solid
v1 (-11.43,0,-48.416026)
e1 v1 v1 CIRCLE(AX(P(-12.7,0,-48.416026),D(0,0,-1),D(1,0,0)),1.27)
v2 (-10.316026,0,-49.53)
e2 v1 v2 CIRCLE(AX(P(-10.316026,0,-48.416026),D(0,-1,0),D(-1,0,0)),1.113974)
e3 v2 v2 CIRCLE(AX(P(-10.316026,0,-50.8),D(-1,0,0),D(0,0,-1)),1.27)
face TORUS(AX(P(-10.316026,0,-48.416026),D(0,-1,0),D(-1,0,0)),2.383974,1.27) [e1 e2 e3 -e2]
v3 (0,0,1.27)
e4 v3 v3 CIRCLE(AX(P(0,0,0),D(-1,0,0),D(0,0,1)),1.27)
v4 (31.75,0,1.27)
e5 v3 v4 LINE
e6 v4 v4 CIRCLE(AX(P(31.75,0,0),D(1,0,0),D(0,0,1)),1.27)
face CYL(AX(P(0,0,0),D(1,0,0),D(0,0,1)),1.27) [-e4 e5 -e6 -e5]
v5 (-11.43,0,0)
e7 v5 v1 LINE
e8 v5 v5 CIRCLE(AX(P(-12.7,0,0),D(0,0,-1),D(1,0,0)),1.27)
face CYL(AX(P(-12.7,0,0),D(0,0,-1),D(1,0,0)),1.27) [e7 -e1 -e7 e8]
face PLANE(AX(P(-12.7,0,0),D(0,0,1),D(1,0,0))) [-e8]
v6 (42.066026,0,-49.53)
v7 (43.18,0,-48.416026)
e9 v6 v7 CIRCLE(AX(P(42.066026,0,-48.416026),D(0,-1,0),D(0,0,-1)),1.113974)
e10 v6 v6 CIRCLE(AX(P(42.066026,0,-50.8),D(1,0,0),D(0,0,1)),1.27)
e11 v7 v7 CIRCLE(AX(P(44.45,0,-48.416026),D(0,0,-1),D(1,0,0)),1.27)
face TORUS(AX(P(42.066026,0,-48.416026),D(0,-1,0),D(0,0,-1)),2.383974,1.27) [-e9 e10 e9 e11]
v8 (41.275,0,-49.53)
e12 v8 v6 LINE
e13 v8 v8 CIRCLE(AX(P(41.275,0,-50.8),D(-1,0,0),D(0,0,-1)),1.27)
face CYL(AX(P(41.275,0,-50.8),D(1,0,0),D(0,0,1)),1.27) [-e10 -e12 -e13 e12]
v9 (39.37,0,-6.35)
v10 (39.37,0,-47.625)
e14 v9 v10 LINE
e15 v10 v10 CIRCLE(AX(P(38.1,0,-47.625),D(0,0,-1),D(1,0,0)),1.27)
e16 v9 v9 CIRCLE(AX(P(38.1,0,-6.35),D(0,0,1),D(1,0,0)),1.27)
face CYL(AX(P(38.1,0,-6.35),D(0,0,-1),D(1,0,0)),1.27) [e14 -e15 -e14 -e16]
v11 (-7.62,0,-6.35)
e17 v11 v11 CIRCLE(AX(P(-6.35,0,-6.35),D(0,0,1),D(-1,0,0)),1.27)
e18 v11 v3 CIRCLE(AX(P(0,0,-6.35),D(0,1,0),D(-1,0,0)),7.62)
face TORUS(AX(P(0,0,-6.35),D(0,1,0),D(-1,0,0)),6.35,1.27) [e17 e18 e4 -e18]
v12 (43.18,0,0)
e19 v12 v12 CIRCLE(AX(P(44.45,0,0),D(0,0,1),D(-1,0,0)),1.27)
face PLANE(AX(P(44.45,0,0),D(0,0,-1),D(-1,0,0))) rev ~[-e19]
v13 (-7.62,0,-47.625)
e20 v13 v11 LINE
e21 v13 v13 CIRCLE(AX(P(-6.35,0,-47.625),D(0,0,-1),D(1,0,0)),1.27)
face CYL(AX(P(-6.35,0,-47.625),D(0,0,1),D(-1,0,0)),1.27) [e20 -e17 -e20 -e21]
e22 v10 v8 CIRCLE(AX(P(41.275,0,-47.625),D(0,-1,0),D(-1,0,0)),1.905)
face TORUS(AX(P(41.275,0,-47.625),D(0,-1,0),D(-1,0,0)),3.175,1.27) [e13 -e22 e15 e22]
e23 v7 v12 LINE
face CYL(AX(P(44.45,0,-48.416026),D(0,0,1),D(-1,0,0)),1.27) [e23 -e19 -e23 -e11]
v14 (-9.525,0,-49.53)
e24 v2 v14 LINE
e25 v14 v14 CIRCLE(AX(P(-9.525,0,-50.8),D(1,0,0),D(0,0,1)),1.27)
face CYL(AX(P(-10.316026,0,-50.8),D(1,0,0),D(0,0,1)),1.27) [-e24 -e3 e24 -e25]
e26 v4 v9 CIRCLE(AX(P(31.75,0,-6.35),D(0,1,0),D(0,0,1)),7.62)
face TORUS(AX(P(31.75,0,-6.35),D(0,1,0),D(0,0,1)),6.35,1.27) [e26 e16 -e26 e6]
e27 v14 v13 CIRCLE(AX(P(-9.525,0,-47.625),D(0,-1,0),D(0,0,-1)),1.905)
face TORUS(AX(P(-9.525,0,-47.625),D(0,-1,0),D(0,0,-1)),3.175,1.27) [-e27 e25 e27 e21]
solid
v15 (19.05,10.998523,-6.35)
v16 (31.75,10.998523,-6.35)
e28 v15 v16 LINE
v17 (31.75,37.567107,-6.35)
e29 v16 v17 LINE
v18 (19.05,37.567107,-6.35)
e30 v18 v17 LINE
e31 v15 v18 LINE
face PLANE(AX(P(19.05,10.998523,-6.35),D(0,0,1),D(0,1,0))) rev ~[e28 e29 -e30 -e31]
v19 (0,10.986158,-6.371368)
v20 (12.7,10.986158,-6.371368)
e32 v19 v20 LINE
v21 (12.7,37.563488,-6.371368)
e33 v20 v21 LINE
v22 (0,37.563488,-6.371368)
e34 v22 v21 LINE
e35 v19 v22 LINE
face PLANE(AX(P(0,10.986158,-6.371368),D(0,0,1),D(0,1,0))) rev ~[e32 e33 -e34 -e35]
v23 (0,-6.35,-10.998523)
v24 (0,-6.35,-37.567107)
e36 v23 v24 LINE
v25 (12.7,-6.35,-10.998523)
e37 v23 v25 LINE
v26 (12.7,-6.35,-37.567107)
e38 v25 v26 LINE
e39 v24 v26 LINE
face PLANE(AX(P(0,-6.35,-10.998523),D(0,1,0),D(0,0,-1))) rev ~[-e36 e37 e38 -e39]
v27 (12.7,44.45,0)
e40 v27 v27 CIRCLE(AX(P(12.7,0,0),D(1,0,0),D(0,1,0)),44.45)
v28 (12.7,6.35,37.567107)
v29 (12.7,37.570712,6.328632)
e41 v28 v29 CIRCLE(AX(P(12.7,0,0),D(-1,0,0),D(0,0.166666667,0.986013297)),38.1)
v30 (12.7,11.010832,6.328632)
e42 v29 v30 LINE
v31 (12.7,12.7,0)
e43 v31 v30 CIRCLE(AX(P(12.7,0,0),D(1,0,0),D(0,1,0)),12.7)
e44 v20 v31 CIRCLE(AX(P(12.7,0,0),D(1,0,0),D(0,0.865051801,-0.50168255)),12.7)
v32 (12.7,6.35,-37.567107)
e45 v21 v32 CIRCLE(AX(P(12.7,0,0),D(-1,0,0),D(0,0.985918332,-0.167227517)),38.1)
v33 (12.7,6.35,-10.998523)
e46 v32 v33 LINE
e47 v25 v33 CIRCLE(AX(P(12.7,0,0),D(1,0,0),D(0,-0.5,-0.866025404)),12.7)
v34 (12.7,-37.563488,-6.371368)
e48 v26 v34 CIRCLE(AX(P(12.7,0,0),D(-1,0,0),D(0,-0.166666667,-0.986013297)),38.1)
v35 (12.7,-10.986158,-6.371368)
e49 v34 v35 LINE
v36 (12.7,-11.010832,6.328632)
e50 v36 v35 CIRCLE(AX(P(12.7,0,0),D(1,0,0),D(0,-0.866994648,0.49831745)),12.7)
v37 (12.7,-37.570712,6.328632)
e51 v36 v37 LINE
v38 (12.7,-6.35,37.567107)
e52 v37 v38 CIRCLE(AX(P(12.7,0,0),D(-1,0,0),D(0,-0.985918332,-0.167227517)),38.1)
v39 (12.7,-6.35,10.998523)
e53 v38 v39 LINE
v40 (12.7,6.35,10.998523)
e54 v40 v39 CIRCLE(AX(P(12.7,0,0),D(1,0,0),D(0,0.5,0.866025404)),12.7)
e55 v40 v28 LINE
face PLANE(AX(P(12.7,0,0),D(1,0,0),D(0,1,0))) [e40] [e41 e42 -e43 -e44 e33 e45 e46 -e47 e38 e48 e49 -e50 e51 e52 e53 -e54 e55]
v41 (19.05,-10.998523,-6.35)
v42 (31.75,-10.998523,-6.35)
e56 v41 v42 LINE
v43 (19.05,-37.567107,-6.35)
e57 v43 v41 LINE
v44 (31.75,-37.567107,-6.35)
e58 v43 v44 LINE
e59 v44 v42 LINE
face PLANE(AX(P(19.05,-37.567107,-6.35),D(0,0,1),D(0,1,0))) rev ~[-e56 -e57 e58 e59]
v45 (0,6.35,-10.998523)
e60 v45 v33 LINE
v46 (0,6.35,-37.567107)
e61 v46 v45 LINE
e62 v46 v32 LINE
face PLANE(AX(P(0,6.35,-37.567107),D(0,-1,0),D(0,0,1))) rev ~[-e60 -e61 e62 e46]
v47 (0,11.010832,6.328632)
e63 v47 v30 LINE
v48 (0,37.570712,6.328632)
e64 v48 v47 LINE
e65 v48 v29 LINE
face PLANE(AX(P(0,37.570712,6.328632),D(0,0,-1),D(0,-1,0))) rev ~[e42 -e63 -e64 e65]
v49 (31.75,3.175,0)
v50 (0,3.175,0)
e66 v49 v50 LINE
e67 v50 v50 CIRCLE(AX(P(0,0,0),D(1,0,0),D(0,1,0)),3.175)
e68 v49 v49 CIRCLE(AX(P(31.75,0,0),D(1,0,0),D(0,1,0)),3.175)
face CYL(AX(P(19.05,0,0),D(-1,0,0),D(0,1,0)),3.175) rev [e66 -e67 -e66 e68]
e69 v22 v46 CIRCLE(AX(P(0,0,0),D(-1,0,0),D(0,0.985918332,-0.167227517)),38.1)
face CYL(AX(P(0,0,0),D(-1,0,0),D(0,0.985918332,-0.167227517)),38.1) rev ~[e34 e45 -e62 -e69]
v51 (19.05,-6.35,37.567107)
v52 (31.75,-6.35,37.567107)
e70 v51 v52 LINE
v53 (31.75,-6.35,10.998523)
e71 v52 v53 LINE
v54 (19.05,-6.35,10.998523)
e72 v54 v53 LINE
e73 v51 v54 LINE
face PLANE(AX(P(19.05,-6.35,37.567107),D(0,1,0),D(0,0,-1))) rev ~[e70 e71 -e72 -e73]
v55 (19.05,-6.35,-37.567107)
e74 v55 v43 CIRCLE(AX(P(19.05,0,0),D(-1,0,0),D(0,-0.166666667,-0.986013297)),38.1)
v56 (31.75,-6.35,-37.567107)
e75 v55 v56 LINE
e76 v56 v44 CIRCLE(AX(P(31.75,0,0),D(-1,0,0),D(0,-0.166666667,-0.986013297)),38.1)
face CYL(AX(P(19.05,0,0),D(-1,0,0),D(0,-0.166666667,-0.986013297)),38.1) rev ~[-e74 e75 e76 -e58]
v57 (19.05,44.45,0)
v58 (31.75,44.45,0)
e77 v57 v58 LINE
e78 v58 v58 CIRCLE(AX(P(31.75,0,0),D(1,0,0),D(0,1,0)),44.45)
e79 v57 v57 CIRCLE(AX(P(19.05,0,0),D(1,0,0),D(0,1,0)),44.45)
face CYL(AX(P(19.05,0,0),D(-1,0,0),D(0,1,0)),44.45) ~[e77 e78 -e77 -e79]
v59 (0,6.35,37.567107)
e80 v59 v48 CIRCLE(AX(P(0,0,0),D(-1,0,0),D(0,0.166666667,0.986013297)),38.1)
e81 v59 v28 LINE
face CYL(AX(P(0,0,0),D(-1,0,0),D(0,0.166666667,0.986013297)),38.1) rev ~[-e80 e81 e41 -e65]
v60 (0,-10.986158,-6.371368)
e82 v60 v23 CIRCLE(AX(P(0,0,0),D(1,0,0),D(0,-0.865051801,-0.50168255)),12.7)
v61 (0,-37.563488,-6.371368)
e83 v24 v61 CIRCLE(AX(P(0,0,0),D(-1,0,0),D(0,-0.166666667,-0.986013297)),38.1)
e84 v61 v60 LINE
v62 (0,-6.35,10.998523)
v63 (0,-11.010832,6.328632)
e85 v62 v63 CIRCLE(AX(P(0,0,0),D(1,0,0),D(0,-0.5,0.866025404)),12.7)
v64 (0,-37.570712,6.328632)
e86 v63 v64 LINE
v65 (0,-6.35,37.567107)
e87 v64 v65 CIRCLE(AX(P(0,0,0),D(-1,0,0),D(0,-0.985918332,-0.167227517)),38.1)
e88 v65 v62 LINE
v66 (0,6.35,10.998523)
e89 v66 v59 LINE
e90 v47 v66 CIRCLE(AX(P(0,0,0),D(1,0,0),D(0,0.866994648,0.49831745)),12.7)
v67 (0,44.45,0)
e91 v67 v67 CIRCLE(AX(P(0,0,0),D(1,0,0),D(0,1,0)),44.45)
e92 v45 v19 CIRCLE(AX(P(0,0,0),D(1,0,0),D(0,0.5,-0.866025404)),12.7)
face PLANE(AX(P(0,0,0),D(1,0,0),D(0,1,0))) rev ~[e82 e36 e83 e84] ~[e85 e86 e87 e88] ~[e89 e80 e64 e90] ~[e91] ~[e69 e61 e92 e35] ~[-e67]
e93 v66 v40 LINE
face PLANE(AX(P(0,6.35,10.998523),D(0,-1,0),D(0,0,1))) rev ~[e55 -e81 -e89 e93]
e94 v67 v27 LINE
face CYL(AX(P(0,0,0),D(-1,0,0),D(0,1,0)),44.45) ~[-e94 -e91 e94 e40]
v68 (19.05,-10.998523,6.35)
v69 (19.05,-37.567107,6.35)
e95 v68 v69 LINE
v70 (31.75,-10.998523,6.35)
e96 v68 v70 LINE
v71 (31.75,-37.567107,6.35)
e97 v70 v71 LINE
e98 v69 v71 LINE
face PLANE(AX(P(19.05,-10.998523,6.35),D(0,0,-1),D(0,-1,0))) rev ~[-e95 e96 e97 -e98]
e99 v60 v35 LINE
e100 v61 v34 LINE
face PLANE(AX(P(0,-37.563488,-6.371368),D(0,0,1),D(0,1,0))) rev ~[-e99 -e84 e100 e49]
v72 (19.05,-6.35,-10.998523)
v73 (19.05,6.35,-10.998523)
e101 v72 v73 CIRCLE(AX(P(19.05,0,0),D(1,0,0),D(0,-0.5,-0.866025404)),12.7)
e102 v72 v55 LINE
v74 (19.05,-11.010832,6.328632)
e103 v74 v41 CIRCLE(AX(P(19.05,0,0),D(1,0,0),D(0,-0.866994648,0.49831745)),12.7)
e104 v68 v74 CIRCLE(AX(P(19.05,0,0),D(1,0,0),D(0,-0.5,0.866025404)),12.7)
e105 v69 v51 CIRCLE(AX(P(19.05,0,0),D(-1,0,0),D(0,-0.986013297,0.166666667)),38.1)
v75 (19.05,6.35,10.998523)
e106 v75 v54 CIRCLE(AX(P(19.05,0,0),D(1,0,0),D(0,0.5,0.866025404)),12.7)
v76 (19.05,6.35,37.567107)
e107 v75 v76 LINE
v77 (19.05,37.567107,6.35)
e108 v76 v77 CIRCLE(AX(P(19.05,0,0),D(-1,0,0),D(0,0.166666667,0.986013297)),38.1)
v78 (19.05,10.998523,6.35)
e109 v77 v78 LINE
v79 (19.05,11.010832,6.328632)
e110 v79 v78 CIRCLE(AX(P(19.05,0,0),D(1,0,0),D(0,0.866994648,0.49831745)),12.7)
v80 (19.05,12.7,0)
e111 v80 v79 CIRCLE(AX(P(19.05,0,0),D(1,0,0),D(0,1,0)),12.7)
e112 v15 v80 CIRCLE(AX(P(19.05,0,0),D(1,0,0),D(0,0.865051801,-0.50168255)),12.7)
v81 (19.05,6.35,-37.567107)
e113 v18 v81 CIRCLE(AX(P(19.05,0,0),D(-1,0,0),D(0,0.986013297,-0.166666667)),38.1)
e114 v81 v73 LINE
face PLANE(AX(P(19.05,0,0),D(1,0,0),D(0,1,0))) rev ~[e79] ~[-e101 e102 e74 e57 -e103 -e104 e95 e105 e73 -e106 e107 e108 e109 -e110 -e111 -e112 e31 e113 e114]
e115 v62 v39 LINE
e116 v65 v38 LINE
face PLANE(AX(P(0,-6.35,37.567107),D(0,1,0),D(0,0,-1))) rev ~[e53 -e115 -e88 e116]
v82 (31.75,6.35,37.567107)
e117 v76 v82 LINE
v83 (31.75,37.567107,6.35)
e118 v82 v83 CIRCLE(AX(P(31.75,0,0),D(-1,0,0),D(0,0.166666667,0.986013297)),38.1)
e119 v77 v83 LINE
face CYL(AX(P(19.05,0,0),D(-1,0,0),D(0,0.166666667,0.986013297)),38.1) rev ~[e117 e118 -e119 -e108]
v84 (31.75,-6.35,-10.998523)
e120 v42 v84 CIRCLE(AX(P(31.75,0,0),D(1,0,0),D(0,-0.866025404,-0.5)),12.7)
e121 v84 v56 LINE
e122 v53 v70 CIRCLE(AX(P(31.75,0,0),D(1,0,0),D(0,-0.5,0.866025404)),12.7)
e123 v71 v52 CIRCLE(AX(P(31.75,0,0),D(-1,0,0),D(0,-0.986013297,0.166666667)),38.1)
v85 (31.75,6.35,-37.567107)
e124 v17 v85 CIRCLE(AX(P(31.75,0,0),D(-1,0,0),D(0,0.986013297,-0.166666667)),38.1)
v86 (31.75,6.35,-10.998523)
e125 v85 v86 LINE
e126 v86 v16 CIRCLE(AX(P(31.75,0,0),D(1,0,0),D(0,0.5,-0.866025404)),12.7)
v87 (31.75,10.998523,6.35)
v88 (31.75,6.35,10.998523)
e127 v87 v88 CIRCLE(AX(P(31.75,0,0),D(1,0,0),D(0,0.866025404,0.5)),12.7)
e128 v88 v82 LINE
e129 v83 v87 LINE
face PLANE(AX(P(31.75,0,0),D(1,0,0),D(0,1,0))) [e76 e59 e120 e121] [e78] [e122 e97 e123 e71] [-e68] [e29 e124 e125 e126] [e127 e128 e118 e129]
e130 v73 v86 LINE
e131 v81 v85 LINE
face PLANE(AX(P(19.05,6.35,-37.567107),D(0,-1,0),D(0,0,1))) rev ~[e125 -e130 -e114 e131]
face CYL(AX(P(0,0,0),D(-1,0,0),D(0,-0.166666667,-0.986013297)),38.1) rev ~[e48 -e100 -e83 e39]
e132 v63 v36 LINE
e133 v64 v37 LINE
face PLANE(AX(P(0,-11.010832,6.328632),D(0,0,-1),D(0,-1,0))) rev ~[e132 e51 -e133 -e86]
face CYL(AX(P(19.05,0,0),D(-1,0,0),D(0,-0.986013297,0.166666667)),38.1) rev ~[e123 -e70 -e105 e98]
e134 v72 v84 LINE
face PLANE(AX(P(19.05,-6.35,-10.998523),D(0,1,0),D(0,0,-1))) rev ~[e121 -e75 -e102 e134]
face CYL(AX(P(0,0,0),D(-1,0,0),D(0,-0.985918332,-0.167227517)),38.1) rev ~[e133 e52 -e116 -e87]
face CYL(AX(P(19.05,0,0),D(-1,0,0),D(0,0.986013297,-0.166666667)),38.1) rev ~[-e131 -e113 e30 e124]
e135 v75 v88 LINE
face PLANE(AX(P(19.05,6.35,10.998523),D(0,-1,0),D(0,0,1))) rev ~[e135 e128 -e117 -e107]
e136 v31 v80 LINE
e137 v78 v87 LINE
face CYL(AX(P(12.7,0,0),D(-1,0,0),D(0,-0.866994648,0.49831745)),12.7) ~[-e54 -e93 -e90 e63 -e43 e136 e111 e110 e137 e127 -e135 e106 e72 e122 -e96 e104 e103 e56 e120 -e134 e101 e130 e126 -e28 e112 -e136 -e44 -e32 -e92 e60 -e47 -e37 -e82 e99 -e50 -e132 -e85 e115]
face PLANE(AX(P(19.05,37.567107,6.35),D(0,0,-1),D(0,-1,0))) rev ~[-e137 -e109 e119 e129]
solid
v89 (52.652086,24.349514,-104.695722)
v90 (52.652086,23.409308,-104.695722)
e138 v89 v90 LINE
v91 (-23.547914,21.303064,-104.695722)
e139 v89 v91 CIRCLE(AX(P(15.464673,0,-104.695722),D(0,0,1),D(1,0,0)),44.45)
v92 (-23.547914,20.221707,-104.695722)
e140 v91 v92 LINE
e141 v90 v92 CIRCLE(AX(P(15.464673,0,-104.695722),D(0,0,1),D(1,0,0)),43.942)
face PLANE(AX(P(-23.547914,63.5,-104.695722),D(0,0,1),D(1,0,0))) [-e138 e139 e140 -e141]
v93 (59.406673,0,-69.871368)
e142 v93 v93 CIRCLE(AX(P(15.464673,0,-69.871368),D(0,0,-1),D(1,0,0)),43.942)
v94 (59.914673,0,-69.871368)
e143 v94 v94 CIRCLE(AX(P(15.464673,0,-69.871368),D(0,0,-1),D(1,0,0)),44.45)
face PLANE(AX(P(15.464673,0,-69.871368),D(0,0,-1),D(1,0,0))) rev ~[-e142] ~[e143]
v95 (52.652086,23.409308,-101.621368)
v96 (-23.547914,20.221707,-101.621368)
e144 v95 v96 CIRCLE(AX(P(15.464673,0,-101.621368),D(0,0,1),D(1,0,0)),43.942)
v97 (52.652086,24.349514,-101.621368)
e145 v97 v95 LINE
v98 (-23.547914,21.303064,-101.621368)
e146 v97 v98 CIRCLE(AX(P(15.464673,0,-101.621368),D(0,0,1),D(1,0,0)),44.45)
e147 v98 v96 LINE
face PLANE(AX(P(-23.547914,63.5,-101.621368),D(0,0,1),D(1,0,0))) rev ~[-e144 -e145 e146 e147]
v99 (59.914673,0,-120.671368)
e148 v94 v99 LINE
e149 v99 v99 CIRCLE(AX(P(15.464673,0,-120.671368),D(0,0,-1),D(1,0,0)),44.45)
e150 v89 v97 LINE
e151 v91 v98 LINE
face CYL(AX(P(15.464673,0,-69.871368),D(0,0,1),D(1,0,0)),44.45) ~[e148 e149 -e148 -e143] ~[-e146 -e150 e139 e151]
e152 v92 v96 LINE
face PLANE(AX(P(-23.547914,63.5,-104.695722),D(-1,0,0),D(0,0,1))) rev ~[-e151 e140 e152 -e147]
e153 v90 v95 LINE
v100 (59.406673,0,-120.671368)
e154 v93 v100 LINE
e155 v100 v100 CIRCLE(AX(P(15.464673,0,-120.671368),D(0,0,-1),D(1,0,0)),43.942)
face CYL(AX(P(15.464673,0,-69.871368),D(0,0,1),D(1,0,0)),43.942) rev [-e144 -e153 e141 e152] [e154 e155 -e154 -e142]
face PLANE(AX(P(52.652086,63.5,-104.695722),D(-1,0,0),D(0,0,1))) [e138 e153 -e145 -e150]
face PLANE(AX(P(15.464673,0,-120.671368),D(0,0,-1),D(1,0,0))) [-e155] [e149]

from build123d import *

# Parameters (mm, degrees)
F0_R      = 44.45
F0_R_2    = 3.175
F1_DEPTH  = 12.7
F2_R      = 3.175
F3_DEPTH  = 6.35
F4_R      = 44.45
F4_R_2    = 3.175
F5_DEPTH  = 12.7
F6_R      = 1.016
F7_DEPTH  = 25.4
F8_R      = 10.2329396238
F8_R_2    = 1.016
F9_DEPTH  = 55.88
F12_R     = 1.27
F15_R     = 44.45
F15_R_2   = 43.942
F16_DEPTH = 50.8
F18_W     = 76.2
F18_H     = 3.0743540772
F19_DEPTH = 50.8


with BuildPart() as f1:
    # F0 (on Right) → F1 (new body)
    with BuildSketch(Plane.YZ):
        Circle(F0_R)
        with BuildLine():
            ThreePointArc((37.5707122885, 6.3286316164), (37.9674474925, 3.1753631138), (38.1, 0))
            ThreePointArc((38.1, 0), (37.9656351859, -3.1969587), (37.5634884552, -6.3713683836))
            ThreePointArc((37.5634884552, -6.3713683836), (26.9331048739, -26.9484296732), (6.35, -37.5671066227))
            ThreePointArc((6.35, -37.5671066227), (0, -38.1), (-6.35, -37.5671066227))
            ThreePointArc((-6.35, -37.5671066227), (-26.9331048739, -26.9484296732), (-37.5634884552, -6.3713683836))
            ThreePointArc((-37.5634884552, -6.3713683836), (-38.0999938366, -0.0216714965), (-37.5707122885, 6.3286316164))
            ThreePointArc((-37.5707122885, 6.3286316164), (-26.9484289368, 26.9331056107), (-6.35, 37.5671066227))
            ThreePointArc((-6.35, 37.5671066227), (0, 38.1), (6.35, 37.5671066227))
            ThreePointArc((6.35, 37.5671066227), (26.9484289368, 26.9331056107), (37.5707122885, 6.3286316164))
        make_face(mode=Mode.SUBTRACT)
        with BuildLine():
            Line((6.35, 10.9985226281), (6.35, 37.5671066227))
            ThreePointArc((6.35, 37.5671066227), (0, 38.1), (-6.35, 37.5671066227))
            Line((-6.35, 37.5671066227), (-6.35, 10.9985226281))
            ThreePointArc((-6.35, 10.9985226281), (0, 12.7), (6.35, 10.9985226281))
        make_face()
        with BuildLine():
            Line((-11.0108320241, 6.3286316164), (-37.5707122885, 6.3286316164))
            ThreePointArc((-37.5707122885, 6.3286316164), (-38.0999938366, -0.0216714965), (-37.5634884552, -6.3713683836))
            Line((-37.5634884552, -6.3713683836), (-10.986157878, -6.3713683836))
            ThreePointArc((-10.986157878, -6.3713683836), (-12.699976031, -0.0246740995), (-11.0108320241, 6.3286316164))
        make_face()
        with BuildLine():
            ThreePointArc((37.5634884552, -6.3713683836), (37.9656351859, -3.1969587), (38.1, 0))
            ThreePointArc((38.1, 0), (37.9674474925, 3.1753631138), (37.5707122885, 6.3286316164))
            Line((37.5707122885, 6.3286316164), (11.0108320241, 6.3286316164))
            ThreePointArc((11.0108320241, 6.3286316164), (12.2704434864, 3.2750903265), (12.7, 0))
            ThreePointArc((12.7, 0), (12.2640573435, -3.2989236843), (10.986157878, -6.3713683836))
            Line((10.986157878, -6.3713683836), (37.5634884552, -6.3713683836))
        make_face()
        with BuildLine():
            ThreePointArc((-6.35, -37.5671066227), (0, -38.1), (6.35, -37.5671066227))
            Line((6.35, -37.5671066227), (6.35, -11.9964098558))
            Line((6.35, -11.9964098558), (6.35, -10.9985226281))
            ThreePointArc((6.35, -10.9985226281), (0, -12.7), (-6.35, -10.9985226281))
            Line((-6.35, -10.9985226281), (-6.35, -37.5671066227))
        make_face()
        with BuildLine():
            ThreePointArc((12.7, 0), (12.2704434864, 3.2750903265), (11.0108320241, 6.3286316164))
            ThreePointArc((11.0108320241, 6.3286316164), (8.9889706117, 8.9715331656), (6.35, 10.9985226281))
            ThreePointArc((6.35, 10.9985226281), (0, 12.7), (-6.35, 10.9985226281))
            ThreePointArc((-6.35, 10.9985226281), (-8.9889706117, 8.9715331656), (-11.0108320241, 6.3286316164))
            ThreePointArc((-11.0108320241, 6.3286316164), (-12.699976031, -0.0246740995), (-10.986157878, -6.3713683836))
            ThreePointArc((-10.986157878, -6.3713683836), (-8.9715233708, -8.9889803875), (-6.35, -10.9985226281))
            ThreePointArc((-6.35, -10.9985226281), (0, -12.7), (6.35, -10.9985226281))
            ThreePointArc((6.35, -10.9985226281), (8.9715233708, -8.9889803875), (10.986157878, -6.3713683836))
            ThreePointArc((10.986157878, -6.3713683836), (12.2640573435, -3.2989236843), (12.7, 0))
        make_face()
        Circle(F0_R_2, mode=Mode.SUBTRACT)
    extrude(amount=F1_DEPTH)

    # F2 (on face) → F3 (join)
    with BuildSketch(Plane.YZ.offset(12.7)):
        with BuildLine():
            ThreePointArc((10.986157878, -6.3713683836), (12.2640573435, -3.2989236843), (12.7, 0))
            ThreePointArc((12.7, 0), (12.2704434864, 3.2750903265), (11.0108320241, 6.3286316164))
            ThreePointArc((11.0108320241, 6.3286316164), (8.9889706117, 8.9715331656), (6.35, 10.9985226281))
            ThreePointArc((6.35, 10.9985226281), (0, 12.7), (-6.35, 10.9985226281))
            ThreePointArc((-6.35, 10.9985226281), (-8.9889706117, 8.9715331656), (-11.0108320241, 6.3286316164))
            ThreePointArc((-11.0108320241, 6.3286316164), (-12.699976031, -0.0246740995), (-10.986157878, -6.3713683836))
            ThreePointArc((-10.986157878, -6.3713683836), (-8.9715233708, -8.9889803875), (-6.35, -10.9985226281))
            ThreePointArc((-6.35, -10.9985226281), (0, -12.7), (6.35, -10.9985226281))
            ThreePointArc((6.35, -10.9985226281), (8.9715233708, -8.9889803875), (10.986157878, -6.3713683836))
        make_face()
        Circle(F2_R, mode=Mode.SUBTRACT)
    extrude(amount=F3_DEPTH)

    # F4 (on face) → F5 (join)
    with BuildSketch(Plane.YZ.offset(19.05)):
        Circle(F4_R)
        with BuildLine():
            ThreePointArc((37.5671066227, 6.35), (37.9665429182, 3.1861605167), (38.1, 0))
            ThreePointArc((38.1, 0), (37.9665429182, -3.1861605167), (37.5671066227, -6.35))
            ThreePointArc((37.5671066227, -6.35), (26.9407683632, -26.9407683632), (6.35, -37.5671066227))
            ThreePointArc((6.35, -37.5671066227), (0, -38.1), (-6.35, -37.5671066227))
            ThreePointArc((-6.35, -37.5671066227), (-26.9407683632, -26.9407683632), (-37.5671066227, -6.35))
            ThreePointArc((-37.5671066227, -6.35), (-38.1, 0), (-37.5671066227, 6.35))
            ThreePointArc((-37.5671066227, 6.35), (-26.9407683632, 26.9407683632), (-6.35, 37.5671066227))
            ThreePointArc((-6.35, 37.5671066227), (0, 38.1), (6.35, 37.5671066227))
            ThreePointArc((6.35, 37.5671066227), (26.9407683632, 26.9407683632), (37.5671066227, 6.35))
        make_face(mode=Mode.SUBTRACT)
        with BuildLine():
            ThreePointArc((10.9985226281, 6.35), (8.9802561211, 8.9802561211), (6.35, 10.9985226281))
            ThreePointArc((6.35, 10.9985226281), (0, 12.7), (-6.35, 10.9985226281))
            ThreePointArc((-6.35, 10.9985226281), (-8.9802561211, 8.9802561211), (-10.9985226281, 6.35))
            ThreePointArc((-10.9985226281, 6.35), (-12.7, 0), (-10.9985226281, -6.35))
            ThreePointArc((-10.9985226281, -6.35), (-8.9802561211, -8.9802561211), (-6.35, -10.9985226281))
            ThreePointArc((-6.35, -10.9985226281), (0, -12.7), (6.35, -10.9985226281))
            ThreePointArc((6.35, -10.9985226281), (8.9802561211, -8.9802561211), (10.9985226281, -6.35))
            ThreePointArc((10.9985226281, -6.35), (12.2672579939, -3.2870018728), (12.7, 0))
            ThreePointArc((12.7, 0), (12.2672579939, 3.2870018728), (10.9985226281, 6.35))
        make_face()
        Circle(F4_R_2, mode=Mode.SUBTRACT)
        with BuildLine():
            Line((6.35, 10.9985226281), (6.35, 37.5671066227))
            ThreePointArc((6.35, 37.5671066227), (0, 38.1), (-6.35, 37.5671066227))
            Line((-6.35, 37.5671066227), (-6.35, 10.9985226281))
            ThreePointArc((-6.35, 10.9985226281), (0, 12.7), (6.35, 10.9985226281))
        make_face()
        with BuildLine():
            ThreePointArc((37.5671066227, -6.35), (37.9665429182, -3.1861605167), (38.1, 0))
            ThreePointArc((38.1, 0), (37.9665429182, 3.1861605167), (37.5671066227, 6.35))
            Line((37.5671066227, 6.35), (21.1177552809, 6.35))
            Line((21.1177552809, 6.35), (10.9985226281, 6.35))
            ThreePointArc((10.9985226281, 6.35), (12.2672579939, 3.2870018728), (12.7, 0))
            ThreePointArc((12.7, 0), (12.2672579939, -3.2870018728), (10.9985226281, -6.35))
            Line((10.9985226281, -6.35), (21.1177552809, -6.35))
            Line((21.1177552809, -6.35), (37.5671066227, -6.35))
        make_face()
        with BuildLine():
            ThreePointArc((-6.35, -37.5671066227), (0, -38.1), (6.35, -37.5671066227))
            Line((6.35, -37.5671066227), (6.35, -10.9985226281))
            ThreePointArc((6.35, -10.9985226281), (0, -12.7), (-6.35, -10.9985226281))
            Line((-6.35, -10.9985226281), (-6.35, -37.5671066227))
        make_face()
        with BuildLine():
            Line((-10.9985226281, 6.35), (-37.5671066227, 6.35))
            ThreePointArc((-37.5671066227, 6.35), (-38.1, 0), (-37.5671066227, -6.35))
            Line((-37.5671066227, -6.35), (-10.9985226281, -6.35))
            ThreePointArc((-10.9985226281, -6.35), (-12.7, 0), (-10.9985226281, 6.35))
        make_face()
    extrude(amount=F5_DEPTH)


with BuildPart() as f7:
    # F6 (on face) → F7 (new body)
    with BuildSketch(Plane.YZ.offset(31.75)):
        Circle(F6_R)
    extrude(amount=F7_DEPTH)

    # F8 (on face) → F9 (join)
    with BuildSketch(Plane(origin=(31.75, 0, 0), x_dir=(0, -1, 0), z_dir=(-1, 0, 0))):
        Circle(F8_R)
        Circle(F8_R_2, mode=Mode.SUBTRACT)
    extrude(amount=F9_DEPTH)


with BuildPart() as f13:
    # F13: sweep along a path in F11
    with BuildLine(Plane.XZ) as f13_path:
        Line((-12.7, 0), (-12.7, -48.4160261258))
        ThreePointArc((-12.7, -48.4160261258), (-12.0017502184, -50.1017502184), (-10.3160261258, -50.8))
        Line((-10.3160261258, -50.8), (-9.525, -50.8))
        ThreePointArc((-9.525, -50.8), (-7.2799359697, -49.8700640303), (-6.35, -47.625))
        Line((-6.35, -47.625), (-6.35, -6.35))
        ThreePointArc((-6.35, -6.35), (-4.4901280605, -1.8598719395), (0, 0))
        Line((0, 0), (31.75, 0))
        ThreePointArc((31.75, 0), (36.2401280605, -1.8598719395), (38.1, -6.35))
        Line((38.1, -6.35), (38.1, -47.625))
        ThreePointArc((38.1, -47.625), (39.0299359697, -49.8700640303), (41.275, -50.8))
        Line((41.275, -50.8), (42.0660261258, -50.8))
        ThreePointArc((42.0660261258, -50.8), (43.7517502184, -50.1017502184), (44.45, -48.4160261258))
        Line((44.45, -48.4160261258), (44.45, 0))
    # F12 (on Top) → F13 (sweep)
    with BuildSketch(Plane.XY):
        with Locations((-12.7, 0)):
            Circle(F12_R)
    sweep(path=f13_path.line)


with BuildPart() as f16:
    # F15 (on offset) → F16 (new body)
    with BuildSketch(Plane(origin=(0, 0, -69.8713683836), x_dir=(1, 0, 0), z_dir=(0, 0, -1))):
        with Locations((15.4646732695, 0)):
            Circle(F15_R)
        with Locations((15.4646732695, 0)):
            Circle(F15_R_2, mode=Mode.SUBTRACT)
    extrude(amount=F16_DEPTH)

    # F18 (on offset) → F19 (cut)
    with BuildSketch(Plane.XZ.offset(-63.5)):
        with Locations((14.5520862598, -103.1585454222)):
            Rectangle(F18_W, F18_H)
    extrude(amount=F19_DEPTH, mode=Mode.SUBTRACT)


solid = Compound([f1.part, f13.part, f16.part])
